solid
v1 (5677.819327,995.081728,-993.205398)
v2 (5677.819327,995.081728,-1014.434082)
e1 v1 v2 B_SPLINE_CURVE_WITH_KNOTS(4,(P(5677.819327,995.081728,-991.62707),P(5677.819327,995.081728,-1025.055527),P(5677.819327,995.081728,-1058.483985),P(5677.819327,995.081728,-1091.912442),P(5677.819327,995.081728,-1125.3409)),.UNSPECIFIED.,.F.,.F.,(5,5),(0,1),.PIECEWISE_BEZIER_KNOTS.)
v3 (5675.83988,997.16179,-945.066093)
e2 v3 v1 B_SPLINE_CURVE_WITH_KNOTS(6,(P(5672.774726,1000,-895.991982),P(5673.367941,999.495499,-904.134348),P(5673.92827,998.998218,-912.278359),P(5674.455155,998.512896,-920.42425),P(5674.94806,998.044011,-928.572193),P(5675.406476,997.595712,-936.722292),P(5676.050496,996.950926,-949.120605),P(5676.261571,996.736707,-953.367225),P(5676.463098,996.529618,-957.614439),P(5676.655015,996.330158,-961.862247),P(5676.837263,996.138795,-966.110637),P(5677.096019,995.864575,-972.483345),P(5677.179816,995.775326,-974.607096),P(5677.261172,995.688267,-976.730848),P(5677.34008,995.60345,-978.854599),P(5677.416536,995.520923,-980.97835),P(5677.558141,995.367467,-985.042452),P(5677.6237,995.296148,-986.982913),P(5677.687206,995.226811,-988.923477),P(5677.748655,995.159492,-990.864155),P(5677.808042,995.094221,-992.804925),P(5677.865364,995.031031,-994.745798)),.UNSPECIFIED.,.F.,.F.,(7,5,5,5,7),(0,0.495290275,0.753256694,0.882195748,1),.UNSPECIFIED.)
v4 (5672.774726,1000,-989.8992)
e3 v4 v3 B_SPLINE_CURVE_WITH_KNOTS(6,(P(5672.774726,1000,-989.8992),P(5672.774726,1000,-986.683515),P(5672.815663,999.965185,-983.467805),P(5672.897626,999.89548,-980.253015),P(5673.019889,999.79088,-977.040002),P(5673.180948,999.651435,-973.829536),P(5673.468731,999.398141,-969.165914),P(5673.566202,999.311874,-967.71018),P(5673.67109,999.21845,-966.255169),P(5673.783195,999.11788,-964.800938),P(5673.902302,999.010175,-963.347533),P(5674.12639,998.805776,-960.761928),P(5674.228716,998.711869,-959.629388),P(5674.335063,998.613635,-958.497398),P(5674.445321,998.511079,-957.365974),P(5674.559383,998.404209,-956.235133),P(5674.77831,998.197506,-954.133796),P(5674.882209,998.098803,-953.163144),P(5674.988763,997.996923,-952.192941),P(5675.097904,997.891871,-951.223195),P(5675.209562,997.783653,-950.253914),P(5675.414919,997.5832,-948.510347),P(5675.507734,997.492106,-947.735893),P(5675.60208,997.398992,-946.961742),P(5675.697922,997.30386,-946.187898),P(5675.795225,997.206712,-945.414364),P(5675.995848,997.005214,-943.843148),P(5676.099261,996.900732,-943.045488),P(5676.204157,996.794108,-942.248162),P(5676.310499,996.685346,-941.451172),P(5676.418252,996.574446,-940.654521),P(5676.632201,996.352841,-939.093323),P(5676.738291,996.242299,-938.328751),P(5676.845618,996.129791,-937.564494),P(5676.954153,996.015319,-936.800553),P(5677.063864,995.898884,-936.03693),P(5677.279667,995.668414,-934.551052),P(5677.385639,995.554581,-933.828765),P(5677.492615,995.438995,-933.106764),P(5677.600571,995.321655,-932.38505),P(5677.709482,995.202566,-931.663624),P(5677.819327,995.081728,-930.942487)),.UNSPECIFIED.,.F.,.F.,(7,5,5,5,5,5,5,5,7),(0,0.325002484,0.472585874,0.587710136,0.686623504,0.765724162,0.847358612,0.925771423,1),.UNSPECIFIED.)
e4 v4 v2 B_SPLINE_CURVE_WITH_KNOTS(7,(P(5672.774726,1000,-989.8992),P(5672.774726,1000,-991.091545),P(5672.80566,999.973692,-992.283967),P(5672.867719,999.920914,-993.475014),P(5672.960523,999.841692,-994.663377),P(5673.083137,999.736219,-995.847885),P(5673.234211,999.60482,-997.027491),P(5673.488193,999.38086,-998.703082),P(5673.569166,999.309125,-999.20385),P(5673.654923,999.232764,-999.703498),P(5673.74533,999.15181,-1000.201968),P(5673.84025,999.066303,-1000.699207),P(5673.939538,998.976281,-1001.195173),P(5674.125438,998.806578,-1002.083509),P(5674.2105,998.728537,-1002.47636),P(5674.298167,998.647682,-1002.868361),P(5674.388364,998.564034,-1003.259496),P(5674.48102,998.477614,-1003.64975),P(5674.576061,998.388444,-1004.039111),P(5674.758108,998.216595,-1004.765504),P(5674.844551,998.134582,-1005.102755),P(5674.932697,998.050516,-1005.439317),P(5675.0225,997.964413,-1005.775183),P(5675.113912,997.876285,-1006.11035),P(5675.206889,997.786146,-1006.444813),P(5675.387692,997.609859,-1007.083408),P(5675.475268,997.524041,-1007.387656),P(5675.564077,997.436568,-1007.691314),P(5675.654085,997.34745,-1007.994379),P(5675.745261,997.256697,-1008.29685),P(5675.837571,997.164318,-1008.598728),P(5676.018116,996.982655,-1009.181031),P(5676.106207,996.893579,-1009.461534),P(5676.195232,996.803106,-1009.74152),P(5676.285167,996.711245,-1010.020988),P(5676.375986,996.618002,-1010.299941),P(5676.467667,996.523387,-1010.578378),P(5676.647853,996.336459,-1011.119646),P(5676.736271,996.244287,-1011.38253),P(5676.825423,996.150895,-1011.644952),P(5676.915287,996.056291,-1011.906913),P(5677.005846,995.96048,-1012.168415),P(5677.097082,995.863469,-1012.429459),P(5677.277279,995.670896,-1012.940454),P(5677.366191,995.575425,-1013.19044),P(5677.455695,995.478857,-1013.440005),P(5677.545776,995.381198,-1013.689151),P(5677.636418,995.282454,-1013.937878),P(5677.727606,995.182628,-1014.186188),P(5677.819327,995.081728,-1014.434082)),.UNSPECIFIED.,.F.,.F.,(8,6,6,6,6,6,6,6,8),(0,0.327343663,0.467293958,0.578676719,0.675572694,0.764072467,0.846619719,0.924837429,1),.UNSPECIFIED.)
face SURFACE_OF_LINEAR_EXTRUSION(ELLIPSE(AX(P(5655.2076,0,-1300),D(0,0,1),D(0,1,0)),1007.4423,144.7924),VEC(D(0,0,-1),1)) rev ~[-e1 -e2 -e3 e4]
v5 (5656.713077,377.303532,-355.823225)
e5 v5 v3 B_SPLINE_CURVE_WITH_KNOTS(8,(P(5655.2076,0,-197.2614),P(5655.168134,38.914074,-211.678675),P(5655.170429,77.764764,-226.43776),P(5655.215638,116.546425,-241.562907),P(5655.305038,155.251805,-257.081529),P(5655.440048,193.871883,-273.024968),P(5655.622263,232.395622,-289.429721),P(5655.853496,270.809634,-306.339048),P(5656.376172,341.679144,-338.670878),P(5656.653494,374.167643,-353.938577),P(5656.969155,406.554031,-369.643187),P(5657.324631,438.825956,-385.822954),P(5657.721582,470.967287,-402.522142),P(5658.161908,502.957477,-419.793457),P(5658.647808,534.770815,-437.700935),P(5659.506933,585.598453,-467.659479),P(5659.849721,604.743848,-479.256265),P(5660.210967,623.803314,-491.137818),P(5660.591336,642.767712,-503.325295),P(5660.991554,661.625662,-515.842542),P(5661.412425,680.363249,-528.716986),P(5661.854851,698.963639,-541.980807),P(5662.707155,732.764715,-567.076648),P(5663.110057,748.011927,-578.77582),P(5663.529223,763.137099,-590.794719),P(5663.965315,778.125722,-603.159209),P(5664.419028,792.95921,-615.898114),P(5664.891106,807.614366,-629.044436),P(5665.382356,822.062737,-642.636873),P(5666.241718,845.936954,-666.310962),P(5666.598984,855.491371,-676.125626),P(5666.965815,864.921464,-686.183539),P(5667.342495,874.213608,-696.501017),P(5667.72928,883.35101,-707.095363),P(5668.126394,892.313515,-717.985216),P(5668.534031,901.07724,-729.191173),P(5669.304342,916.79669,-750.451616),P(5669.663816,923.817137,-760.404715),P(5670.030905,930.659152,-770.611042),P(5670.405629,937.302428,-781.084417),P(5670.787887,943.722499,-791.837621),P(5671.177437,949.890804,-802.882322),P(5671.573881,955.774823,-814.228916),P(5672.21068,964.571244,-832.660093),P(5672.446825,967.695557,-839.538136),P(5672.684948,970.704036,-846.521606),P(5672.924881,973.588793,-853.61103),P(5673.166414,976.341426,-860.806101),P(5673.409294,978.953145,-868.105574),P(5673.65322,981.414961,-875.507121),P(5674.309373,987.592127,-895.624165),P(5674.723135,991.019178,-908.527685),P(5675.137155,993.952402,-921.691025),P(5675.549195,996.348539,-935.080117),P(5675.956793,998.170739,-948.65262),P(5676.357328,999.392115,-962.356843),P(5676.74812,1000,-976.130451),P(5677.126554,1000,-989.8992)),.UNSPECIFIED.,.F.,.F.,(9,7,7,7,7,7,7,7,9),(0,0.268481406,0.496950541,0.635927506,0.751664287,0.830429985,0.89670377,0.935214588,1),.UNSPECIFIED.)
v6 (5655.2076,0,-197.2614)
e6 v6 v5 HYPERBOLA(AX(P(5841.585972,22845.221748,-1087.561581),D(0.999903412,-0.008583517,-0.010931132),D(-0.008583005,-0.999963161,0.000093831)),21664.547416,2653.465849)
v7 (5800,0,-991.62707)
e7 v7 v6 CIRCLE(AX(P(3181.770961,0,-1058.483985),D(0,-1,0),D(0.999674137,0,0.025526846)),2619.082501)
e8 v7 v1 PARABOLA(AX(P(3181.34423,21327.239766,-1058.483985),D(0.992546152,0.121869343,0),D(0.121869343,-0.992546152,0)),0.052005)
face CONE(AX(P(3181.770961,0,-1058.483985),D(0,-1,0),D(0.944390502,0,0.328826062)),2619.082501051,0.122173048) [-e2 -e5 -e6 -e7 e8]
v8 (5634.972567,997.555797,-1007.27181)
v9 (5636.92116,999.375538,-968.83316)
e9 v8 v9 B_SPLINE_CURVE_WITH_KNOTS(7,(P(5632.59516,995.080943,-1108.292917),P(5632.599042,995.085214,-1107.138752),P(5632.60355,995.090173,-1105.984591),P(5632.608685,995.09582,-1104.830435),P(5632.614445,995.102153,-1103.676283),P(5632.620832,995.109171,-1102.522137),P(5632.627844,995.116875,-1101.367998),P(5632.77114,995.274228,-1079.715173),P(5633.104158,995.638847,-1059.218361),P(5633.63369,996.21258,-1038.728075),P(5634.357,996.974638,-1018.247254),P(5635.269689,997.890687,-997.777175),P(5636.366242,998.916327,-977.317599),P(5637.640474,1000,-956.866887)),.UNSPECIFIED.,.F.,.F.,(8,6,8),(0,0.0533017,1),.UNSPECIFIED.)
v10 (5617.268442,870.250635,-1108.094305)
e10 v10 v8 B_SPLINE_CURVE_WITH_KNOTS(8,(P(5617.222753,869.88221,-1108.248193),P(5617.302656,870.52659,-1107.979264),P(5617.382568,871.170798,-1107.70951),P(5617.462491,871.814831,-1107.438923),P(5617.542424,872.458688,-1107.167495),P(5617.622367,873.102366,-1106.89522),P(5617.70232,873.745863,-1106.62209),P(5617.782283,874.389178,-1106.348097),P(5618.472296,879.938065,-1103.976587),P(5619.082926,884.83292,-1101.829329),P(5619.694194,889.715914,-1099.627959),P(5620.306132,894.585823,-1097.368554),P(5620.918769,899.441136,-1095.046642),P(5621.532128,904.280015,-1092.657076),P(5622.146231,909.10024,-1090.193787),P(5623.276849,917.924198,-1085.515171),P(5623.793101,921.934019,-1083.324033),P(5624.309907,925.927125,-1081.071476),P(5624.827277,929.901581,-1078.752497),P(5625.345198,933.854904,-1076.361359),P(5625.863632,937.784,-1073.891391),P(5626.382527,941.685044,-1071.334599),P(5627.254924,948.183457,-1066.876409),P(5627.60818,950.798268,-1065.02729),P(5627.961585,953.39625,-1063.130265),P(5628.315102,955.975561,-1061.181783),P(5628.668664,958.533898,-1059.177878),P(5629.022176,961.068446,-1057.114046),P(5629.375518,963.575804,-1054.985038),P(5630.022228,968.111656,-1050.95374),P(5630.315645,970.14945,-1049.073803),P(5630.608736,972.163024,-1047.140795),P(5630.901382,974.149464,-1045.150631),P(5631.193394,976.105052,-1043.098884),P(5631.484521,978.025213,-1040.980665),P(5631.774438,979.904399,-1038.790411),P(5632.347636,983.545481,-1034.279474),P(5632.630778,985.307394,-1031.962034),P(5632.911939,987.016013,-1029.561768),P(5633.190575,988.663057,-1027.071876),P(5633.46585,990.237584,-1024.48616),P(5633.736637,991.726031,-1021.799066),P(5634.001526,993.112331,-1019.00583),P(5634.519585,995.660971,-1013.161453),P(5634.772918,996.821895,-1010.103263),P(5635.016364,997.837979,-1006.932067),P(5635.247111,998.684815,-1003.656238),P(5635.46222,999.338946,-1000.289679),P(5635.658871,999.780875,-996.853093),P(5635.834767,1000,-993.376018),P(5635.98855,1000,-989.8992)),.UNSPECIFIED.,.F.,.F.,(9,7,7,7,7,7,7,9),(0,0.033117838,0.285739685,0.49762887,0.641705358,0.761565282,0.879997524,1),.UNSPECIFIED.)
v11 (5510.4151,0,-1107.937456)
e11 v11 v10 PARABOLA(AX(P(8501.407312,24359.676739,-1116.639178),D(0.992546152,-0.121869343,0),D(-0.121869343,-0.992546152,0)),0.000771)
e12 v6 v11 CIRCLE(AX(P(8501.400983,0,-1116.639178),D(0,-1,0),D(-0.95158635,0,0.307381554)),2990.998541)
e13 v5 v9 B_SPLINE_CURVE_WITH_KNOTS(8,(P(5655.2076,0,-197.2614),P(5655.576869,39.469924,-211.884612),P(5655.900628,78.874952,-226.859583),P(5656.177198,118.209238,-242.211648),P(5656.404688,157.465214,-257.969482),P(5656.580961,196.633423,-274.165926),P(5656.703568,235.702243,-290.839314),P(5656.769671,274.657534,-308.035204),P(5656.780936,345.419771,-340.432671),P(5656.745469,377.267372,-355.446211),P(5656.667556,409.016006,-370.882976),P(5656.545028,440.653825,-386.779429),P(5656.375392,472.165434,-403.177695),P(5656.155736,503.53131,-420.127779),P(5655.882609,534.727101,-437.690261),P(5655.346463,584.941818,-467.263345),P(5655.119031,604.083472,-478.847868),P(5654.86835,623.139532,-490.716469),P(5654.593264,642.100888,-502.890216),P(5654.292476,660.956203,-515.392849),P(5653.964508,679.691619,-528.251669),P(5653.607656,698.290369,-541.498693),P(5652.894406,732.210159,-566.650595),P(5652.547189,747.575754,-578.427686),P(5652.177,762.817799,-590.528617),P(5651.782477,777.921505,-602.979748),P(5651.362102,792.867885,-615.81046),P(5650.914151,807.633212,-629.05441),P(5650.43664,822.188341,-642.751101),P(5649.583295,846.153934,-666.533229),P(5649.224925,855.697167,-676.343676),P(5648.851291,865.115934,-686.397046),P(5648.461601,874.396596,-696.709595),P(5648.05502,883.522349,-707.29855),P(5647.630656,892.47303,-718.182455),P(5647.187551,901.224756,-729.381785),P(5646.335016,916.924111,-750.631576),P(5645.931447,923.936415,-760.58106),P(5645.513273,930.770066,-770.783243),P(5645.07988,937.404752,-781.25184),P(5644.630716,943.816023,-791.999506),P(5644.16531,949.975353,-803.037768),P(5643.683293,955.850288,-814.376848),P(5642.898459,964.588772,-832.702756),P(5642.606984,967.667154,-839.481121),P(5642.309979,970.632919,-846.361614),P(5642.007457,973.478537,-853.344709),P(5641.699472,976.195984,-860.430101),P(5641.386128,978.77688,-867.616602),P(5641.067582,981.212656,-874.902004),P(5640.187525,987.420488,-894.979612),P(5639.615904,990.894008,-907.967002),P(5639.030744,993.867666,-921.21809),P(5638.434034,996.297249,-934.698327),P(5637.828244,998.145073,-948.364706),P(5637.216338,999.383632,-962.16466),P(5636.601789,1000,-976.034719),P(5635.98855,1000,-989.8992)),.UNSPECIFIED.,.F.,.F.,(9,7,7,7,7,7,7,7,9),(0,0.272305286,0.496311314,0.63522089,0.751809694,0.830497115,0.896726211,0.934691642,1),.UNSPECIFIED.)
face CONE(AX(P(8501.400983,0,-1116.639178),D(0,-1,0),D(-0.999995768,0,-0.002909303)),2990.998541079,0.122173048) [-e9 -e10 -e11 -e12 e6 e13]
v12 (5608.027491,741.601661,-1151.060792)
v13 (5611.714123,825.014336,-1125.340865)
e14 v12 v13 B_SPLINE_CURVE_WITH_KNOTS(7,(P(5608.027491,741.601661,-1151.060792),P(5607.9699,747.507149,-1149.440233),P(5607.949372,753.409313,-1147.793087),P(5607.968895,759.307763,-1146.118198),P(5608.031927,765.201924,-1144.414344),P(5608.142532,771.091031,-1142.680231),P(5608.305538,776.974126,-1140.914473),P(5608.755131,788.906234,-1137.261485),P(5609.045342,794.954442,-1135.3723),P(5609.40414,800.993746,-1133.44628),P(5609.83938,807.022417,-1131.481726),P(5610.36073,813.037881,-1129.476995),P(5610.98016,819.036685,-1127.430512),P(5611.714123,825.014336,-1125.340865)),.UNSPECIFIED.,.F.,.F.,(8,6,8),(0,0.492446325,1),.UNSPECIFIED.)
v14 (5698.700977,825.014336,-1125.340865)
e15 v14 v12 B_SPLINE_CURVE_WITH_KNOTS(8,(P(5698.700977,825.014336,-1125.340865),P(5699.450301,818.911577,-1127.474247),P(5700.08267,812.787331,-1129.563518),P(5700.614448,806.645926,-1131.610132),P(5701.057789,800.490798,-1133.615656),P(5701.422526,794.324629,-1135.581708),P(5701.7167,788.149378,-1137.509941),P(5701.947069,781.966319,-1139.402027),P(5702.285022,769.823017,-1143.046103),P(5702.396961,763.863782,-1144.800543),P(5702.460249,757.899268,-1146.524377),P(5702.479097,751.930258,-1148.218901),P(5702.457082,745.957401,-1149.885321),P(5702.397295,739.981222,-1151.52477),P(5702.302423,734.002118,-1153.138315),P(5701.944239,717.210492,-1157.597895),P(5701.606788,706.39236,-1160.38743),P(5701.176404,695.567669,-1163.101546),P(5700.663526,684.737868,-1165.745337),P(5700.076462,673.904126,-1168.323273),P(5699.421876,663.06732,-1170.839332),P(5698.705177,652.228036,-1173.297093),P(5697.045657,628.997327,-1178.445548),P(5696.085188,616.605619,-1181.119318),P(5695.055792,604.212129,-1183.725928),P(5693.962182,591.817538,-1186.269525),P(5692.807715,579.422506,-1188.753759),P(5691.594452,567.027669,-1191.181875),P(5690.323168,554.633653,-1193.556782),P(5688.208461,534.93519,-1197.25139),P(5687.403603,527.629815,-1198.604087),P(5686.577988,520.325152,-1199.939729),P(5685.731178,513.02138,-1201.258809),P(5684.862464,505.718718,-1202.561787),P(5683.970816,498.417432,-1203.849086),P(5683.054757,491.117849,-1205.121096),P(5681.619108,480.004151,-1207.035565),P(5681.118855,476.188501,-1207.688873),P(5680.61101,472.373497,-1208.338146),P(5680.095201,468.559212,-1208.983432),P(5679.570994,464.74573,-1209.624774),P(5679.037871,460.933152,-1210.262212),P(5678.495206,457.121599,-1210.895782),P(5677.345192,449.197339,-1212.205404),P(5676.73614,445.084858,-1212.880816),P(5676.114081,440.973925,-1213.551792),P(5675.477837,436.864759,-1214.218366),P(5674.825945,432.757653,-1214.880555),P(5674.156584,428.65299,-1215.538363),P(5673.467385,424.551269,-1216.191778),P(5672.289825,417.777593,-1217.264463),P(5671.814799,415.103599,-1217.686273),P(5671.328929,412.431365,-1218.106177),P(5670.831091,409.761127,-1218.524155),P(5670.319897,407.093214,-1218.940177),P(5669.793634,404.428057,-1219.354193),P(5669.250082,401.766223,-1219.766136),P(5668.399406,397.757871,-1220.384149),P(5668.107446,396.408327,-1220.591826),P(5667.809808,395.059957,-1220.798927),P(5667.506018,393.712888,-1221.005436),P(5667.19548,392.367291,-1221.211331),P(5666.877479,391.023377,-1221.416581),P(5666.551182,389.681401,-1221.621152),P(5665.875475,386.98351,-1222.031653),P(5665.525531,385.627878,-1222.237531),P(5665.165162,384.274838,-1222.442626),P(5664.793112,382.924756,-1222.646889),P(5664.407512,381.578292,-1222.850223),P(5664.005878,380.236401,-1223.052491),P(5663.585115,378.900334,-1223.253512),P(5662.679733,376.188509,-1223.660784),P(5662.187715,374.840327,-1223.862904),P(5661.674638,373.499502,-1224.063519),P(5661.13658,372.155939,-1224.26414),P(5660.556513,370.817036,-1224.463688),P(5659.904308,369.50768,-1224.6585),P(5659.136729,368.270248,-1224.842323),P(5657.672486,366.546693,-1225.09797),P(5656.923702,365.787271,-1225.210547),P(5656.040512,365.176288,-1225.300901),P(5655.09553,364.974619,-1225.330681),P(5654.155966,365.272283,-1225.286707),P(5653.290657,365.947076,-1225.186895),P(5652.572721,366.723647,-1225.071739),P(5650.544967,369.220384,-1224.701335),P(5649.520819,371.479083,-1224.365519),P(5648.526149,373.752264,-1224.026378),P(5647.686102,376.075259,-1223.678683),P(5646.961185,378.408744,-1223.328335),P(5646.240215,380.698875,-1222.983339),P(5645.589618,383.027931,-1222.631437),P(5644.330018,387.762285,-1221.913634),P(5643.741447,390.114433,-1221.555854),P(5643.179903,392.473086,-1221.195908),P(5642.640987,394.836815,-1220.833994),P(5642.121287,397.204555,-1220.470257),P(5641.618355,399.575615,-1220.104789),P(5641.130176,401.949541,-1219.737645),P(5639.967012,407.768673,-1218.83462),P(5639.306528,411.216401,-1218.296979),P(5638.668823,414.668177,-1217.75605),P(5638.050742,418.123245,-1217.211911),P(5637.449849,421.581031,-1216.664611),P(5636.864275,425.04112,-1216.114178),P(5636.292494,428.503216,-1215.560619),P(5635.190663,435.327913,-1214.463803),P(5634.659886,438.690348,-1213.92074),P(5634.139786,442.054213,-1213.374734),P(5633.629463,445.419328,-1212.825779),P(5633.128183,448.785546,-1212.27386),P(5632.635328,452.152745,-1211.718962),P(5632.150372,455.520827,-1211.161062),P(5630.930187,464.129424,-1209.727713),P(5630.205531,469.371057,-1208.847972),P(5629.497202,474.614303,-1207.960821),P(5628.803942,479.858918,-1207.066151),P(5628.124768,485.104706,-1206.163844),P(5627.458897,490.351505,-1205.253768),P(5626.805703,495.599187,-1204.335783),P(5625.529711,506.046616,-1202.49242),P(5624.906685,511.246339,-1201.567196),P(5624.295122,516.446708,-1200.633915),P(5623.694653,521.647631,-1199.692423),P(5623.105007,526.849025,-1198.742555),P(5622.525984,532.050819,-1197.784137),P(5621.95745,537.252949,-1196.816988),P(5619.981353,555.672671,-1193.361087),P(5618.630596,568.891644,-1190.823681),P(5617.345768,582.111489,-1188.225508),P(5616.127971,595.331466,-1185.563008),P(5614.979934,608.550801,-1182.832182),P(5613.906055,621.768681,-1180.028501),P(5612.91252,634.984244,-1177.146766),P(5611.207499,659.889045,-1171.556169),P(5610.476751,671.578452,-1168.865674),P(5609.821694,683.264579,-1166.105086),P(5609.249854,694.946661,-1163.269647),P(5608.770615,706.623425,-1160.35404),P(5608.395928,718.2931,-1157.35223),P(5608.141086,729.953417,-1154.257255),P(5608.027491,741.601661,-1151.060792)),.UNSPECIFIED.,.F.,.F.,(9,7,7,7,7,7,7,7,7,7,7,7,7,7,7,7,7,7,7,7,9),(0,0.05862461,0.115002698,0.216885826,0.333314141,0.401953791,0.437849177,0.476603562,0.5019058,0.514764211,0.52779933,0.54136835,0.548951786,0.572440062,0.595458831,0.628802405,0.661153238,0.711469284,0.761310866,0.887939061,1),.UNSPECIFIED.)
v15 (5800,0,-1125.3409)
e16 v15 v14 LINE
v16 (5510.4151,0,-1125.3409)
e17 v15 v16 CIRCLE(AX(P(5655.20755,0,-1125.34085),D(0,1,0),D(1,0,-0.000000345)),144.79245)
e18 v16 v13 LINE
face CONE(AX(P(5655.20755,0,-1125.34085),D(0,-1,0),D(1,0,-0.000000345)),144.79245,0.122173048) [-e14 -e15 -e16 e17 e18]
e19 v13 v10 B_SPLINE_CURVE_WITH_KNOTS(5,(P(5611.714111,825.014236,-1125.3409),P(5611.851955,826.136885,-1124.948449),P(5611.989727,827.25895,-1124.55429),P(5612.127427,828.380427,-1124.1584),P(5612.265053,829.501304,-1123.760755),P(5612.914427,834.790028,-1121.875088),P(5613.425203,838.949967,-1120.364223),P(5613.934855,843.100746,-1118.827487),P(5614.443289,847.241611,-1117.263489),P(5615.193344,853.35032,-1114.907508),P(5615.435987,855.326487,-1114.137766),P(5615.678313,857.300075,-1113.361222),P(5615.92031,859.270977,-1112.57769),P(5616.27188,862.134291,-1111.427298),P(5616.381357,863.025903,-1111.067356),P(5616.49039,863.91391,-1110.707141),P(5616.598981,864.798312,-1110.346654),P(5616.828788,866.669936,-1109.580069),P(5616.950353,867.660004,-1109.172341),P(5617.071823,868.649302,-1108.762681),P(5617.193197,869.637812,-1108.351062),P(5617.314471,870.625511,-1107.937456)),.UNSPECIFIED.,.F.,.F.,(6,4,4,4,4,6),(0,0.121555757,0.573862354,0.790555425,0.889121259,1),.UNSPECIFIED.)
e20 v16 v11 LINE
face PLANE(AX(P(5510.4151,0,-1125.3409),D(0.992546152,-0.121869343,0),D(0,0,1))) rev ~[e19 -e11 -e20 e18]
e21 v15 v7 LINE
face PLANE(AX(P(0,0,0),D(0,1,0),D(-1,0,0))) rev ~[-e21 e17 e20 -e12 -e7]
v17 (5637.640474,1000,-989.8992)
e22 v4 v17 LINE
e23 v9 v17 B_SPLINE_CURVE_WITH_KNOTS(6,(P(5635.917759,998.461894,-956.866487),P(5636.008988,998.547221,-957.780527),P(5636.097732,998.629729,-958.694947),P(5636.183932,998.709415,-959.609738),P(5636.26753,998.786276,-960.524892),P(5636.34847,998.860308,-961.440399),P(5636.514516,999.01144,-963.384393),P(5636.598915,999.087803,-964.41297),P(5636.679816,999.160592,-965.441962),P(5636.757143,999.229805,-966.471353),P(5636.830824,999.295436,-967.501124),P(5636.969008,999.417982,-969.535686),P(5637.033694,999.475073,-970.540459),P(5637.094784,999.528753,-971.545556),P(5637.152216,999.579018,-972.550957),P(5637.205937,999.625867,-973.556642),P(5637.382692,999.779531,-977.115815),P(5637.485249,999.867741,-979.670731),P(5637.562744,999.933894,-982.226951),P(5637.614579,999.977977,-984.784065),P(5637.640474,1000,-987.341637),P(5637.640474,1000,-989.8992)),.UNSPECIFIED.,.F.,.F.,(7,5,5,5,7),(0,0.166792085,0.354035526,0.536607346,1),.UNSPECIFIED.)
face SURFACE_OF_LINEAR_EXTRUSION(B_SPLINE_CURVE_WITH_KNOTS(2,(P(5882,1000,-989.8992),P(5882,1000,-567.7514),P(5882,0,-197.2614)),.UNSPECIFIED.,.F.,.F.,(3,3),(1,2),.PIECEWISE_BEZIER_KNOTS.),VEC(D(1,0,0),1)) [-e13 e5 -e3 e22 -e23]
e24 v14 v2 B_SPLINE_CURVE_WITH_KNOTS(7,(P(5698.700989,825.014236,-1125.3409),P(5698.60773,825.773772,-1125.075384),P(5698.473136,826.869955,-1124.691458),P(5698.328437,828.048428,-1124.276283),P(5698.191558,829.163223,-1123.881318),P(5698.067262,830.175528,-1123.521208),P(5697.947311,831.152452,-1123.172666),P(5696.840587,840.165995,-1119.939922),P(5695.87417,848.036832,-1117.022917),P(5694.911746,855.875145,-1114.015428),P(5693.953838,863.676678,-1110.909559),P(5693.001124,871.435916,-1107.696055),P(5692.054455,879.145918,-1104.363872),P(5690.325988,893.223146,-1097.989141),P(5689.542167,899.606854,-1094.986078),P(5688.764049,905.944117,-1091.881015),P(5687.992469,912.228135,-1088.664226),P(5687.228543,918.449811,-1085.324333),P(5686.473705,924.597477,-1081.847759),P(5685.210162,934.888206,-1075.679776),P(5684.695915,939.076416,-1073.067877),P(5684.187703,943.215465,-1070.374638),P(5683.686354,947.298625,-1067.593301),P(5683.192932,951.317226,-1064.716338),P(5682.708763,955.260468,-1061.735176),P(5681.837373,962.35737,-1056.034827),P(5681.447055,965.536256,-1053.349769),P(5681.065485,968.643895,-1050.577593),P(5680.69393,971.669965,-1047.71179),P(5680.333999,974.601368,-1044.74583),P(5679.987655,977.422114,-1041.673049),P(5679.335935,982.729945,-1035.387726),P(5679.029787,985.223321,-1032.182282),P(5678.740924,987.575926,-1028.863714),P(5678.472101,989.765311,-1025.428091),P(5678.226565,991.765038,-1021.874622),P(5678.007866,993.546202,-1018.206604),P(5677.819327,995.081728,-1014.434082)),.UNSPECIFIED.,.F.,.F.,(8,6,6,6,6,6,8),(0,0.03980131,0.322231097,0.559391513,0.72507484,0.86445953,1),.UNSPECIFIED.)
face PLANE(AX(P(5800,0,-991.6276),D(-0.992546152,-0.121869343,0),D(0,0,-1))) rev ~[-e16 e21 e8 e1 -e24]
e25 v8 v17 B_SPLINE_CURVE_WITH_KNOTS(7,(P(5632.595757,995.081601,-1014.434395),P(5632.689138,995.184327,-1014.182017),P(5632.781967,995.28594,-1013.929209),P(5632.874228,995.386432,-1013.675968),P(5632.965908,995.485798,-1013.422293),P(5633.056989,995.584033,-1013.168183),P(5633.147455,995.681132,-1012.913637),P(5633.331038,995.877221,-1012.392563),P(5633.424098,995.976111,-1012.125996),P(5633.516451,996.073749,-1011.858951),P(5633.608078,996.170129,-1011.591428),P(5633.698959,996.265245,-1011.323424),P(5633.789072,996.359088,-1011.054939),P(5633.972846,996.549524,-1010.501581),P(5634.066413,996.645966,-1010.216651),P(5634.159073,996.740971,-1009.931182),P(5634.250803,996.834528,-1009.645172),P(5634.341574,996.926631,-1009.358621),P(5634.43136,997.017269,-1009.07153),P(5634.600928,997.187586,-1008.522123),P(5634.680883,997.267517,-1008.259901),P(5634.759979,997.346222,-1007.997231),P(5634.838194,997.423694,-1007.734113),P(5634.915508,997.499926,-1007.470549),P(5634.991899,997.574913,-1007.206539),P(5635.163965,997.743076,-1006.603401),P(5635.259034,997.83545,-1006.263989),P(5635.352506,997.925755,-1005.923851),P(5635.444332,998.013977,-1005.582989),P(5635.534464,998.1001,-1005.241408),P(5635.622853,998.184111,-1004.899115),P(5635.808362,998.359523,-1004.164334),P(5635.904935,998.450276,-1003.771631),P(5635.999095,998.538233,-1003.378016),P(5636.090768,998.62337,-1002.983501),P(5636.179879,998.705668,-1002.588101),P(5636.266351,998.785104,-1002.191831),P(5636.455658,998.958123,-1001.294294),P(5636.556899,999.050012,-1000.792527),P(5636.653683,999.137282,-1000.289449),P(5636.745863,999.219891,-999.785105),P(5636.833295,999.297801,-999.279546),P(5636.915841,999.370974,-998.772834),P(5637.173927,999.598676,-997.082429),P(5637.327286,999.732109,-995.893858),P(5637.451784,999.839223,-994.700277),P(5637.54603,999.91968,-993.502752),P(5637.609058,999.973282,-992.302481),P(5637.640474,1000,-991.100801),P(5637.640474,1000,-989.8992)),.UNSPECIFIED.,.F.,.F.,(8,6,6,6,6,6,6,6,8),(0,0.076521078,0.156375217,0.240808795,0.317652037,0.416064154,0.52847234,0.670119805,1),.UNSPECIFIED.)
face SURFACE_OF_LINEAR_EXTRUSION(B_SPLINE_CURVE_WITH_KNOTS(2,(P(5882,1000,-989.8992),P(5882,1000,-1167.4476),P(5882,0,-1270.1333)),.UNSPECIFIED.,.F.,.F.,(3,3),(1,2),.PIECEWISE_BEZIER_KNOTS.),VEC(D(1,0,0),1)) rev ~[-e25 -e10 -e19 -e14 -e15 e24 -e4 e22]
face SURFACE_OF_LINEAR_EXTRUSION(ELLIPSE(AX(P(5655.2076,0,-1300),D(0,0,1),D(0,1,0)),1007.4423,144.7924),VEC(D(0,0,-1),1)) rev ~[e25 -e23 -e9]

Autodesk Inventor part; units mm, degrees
sketch "Sketch4" plane through (0, 0, 0) normal (0, 1, 0) x (-1, 0, 0)
  line L0 (-5800, -1270.1333) -> (-5792.2877, -1270.1333)
  line L1 (-5510.4151, -1125.3409) -> (-5510.4151, -1107.9379)
  line L2 (-5800, -991.6276) -> (-5800, -1125.3409)
  arc A0 (-5800, -1125.3409) -> (-5510.4151, -1125.3409) centre (-5655.2076, -1125.3409) ccw
  arc A1 (-5510.4151, -1125.3409) -> (-5655.2076, -197.2614) centre (-8501.4039, -1116.6394) ccw
  arc A2 (-5655.2076, -197.2614) -> (-5800, -1125.3409) centre (-3181.7697, -1058.4843) ccw
  line L3 (-5792.2877, -1270.1333) -> (-5510.4151, -1270.1333)
  line L4 (-5510.4151, -1270.1333) -> (-5510.4151, -1125.3409)
  line L5 (-5792.2877, -1125.3409) -> (-5792.2877, -1270.1333)
  point P0 (0, 0)
  point P1 (0, 0)
extrude "Extrusion1" add sketch "Sketch4" along normal blind 1000 draft -7 contours A0 L2 A2 A1 L1
ref_plane "Work Plane4" through (5800, 0, -1288.0909) normal (0, 0, 1) x (-0.1218693, 0.9925462, 0)
ref_plane "Work Plane3" through (5800, 0, -1125.3409) normal (0, 0, 1) x (-0.1218693, 0.9925462, 0)
ref_plane "Work Plane5" through (5851, 0, 0) normal (1, 0, 0) x (0, 1, 0)
ref_plane "Work Plane6" through (0, 0, -1300) normal (0, 0, 1) x (1, 0, 0)
sketch "Sketch8" plane through (0, 0, -1300) normal (0, 0, 1) x (1, 0, 0)
  line L0 (5800, 0) -> (5510.4151, 0) projected
  line L1 (5655.2076, 0) -> (5655.2076, 1007.4423)
  line L2 (5800, 0) -> (5510.4151, 0)
  ellipse E0 centre (5655.2076, 0) end of major axis (5655.2076, 1007.4423) minor radius 144.7924 (5800, 0) -> (5510.4151, 0) ccw
  point P0 (0, 0)
extrude "Extrusion4" cut sketch "Sketch8" along normal blind 1274.25 keep common part
ref_plane "Work Plane7" through (5882, 0, 0) normal (1, 0, 0) x (0, 1, 0)
sketch "Sketch9" plane through (5882, 0, 0) normal (1, 0, 0) x (0, 1, 0)
  line L0 (0, -1107.9379) -> (0, -197.2614) projected
  line L1 (0, -197.2614) -> (0, -989.8992)
  line L2 (0, -1270.1333) -> (0, -1125.3409) projected
  line L3 (0, -1270.1333) -> (0, -989.8992)
  line L4 (1000, -741.3614) -> (1000, -1108.1184) projected
  line L5 (1000, -989.8992) -> (1000, -567.7514) construction
  line L6 (1000, -567.7514) -> (0, -197.2614) construction
  spline S0 degree 2 poles (1000, -989.8992) (1000, -567.7514) (0, -197.2614) knots 1 1 1 2 2 2
  line L7 (1000, -989.8992) -> (1000, -1167.4476) construction
  line L8 (1000, -1125.3409) -> (1000, -1147.3488) projected
  line L9 (1000, -1167.4476) -> (0, -1270.1333) construction
  spline S1 degree 2 poles (1000, -989.8992) (1000, -1167.4476) (0, -1270.1333) knots 1 1 1 2 2 2
  point P0 (0, 0)
extrude "Extrusion5" cut sketch "Sketch9" against normal blind 1274.25 keep common part
